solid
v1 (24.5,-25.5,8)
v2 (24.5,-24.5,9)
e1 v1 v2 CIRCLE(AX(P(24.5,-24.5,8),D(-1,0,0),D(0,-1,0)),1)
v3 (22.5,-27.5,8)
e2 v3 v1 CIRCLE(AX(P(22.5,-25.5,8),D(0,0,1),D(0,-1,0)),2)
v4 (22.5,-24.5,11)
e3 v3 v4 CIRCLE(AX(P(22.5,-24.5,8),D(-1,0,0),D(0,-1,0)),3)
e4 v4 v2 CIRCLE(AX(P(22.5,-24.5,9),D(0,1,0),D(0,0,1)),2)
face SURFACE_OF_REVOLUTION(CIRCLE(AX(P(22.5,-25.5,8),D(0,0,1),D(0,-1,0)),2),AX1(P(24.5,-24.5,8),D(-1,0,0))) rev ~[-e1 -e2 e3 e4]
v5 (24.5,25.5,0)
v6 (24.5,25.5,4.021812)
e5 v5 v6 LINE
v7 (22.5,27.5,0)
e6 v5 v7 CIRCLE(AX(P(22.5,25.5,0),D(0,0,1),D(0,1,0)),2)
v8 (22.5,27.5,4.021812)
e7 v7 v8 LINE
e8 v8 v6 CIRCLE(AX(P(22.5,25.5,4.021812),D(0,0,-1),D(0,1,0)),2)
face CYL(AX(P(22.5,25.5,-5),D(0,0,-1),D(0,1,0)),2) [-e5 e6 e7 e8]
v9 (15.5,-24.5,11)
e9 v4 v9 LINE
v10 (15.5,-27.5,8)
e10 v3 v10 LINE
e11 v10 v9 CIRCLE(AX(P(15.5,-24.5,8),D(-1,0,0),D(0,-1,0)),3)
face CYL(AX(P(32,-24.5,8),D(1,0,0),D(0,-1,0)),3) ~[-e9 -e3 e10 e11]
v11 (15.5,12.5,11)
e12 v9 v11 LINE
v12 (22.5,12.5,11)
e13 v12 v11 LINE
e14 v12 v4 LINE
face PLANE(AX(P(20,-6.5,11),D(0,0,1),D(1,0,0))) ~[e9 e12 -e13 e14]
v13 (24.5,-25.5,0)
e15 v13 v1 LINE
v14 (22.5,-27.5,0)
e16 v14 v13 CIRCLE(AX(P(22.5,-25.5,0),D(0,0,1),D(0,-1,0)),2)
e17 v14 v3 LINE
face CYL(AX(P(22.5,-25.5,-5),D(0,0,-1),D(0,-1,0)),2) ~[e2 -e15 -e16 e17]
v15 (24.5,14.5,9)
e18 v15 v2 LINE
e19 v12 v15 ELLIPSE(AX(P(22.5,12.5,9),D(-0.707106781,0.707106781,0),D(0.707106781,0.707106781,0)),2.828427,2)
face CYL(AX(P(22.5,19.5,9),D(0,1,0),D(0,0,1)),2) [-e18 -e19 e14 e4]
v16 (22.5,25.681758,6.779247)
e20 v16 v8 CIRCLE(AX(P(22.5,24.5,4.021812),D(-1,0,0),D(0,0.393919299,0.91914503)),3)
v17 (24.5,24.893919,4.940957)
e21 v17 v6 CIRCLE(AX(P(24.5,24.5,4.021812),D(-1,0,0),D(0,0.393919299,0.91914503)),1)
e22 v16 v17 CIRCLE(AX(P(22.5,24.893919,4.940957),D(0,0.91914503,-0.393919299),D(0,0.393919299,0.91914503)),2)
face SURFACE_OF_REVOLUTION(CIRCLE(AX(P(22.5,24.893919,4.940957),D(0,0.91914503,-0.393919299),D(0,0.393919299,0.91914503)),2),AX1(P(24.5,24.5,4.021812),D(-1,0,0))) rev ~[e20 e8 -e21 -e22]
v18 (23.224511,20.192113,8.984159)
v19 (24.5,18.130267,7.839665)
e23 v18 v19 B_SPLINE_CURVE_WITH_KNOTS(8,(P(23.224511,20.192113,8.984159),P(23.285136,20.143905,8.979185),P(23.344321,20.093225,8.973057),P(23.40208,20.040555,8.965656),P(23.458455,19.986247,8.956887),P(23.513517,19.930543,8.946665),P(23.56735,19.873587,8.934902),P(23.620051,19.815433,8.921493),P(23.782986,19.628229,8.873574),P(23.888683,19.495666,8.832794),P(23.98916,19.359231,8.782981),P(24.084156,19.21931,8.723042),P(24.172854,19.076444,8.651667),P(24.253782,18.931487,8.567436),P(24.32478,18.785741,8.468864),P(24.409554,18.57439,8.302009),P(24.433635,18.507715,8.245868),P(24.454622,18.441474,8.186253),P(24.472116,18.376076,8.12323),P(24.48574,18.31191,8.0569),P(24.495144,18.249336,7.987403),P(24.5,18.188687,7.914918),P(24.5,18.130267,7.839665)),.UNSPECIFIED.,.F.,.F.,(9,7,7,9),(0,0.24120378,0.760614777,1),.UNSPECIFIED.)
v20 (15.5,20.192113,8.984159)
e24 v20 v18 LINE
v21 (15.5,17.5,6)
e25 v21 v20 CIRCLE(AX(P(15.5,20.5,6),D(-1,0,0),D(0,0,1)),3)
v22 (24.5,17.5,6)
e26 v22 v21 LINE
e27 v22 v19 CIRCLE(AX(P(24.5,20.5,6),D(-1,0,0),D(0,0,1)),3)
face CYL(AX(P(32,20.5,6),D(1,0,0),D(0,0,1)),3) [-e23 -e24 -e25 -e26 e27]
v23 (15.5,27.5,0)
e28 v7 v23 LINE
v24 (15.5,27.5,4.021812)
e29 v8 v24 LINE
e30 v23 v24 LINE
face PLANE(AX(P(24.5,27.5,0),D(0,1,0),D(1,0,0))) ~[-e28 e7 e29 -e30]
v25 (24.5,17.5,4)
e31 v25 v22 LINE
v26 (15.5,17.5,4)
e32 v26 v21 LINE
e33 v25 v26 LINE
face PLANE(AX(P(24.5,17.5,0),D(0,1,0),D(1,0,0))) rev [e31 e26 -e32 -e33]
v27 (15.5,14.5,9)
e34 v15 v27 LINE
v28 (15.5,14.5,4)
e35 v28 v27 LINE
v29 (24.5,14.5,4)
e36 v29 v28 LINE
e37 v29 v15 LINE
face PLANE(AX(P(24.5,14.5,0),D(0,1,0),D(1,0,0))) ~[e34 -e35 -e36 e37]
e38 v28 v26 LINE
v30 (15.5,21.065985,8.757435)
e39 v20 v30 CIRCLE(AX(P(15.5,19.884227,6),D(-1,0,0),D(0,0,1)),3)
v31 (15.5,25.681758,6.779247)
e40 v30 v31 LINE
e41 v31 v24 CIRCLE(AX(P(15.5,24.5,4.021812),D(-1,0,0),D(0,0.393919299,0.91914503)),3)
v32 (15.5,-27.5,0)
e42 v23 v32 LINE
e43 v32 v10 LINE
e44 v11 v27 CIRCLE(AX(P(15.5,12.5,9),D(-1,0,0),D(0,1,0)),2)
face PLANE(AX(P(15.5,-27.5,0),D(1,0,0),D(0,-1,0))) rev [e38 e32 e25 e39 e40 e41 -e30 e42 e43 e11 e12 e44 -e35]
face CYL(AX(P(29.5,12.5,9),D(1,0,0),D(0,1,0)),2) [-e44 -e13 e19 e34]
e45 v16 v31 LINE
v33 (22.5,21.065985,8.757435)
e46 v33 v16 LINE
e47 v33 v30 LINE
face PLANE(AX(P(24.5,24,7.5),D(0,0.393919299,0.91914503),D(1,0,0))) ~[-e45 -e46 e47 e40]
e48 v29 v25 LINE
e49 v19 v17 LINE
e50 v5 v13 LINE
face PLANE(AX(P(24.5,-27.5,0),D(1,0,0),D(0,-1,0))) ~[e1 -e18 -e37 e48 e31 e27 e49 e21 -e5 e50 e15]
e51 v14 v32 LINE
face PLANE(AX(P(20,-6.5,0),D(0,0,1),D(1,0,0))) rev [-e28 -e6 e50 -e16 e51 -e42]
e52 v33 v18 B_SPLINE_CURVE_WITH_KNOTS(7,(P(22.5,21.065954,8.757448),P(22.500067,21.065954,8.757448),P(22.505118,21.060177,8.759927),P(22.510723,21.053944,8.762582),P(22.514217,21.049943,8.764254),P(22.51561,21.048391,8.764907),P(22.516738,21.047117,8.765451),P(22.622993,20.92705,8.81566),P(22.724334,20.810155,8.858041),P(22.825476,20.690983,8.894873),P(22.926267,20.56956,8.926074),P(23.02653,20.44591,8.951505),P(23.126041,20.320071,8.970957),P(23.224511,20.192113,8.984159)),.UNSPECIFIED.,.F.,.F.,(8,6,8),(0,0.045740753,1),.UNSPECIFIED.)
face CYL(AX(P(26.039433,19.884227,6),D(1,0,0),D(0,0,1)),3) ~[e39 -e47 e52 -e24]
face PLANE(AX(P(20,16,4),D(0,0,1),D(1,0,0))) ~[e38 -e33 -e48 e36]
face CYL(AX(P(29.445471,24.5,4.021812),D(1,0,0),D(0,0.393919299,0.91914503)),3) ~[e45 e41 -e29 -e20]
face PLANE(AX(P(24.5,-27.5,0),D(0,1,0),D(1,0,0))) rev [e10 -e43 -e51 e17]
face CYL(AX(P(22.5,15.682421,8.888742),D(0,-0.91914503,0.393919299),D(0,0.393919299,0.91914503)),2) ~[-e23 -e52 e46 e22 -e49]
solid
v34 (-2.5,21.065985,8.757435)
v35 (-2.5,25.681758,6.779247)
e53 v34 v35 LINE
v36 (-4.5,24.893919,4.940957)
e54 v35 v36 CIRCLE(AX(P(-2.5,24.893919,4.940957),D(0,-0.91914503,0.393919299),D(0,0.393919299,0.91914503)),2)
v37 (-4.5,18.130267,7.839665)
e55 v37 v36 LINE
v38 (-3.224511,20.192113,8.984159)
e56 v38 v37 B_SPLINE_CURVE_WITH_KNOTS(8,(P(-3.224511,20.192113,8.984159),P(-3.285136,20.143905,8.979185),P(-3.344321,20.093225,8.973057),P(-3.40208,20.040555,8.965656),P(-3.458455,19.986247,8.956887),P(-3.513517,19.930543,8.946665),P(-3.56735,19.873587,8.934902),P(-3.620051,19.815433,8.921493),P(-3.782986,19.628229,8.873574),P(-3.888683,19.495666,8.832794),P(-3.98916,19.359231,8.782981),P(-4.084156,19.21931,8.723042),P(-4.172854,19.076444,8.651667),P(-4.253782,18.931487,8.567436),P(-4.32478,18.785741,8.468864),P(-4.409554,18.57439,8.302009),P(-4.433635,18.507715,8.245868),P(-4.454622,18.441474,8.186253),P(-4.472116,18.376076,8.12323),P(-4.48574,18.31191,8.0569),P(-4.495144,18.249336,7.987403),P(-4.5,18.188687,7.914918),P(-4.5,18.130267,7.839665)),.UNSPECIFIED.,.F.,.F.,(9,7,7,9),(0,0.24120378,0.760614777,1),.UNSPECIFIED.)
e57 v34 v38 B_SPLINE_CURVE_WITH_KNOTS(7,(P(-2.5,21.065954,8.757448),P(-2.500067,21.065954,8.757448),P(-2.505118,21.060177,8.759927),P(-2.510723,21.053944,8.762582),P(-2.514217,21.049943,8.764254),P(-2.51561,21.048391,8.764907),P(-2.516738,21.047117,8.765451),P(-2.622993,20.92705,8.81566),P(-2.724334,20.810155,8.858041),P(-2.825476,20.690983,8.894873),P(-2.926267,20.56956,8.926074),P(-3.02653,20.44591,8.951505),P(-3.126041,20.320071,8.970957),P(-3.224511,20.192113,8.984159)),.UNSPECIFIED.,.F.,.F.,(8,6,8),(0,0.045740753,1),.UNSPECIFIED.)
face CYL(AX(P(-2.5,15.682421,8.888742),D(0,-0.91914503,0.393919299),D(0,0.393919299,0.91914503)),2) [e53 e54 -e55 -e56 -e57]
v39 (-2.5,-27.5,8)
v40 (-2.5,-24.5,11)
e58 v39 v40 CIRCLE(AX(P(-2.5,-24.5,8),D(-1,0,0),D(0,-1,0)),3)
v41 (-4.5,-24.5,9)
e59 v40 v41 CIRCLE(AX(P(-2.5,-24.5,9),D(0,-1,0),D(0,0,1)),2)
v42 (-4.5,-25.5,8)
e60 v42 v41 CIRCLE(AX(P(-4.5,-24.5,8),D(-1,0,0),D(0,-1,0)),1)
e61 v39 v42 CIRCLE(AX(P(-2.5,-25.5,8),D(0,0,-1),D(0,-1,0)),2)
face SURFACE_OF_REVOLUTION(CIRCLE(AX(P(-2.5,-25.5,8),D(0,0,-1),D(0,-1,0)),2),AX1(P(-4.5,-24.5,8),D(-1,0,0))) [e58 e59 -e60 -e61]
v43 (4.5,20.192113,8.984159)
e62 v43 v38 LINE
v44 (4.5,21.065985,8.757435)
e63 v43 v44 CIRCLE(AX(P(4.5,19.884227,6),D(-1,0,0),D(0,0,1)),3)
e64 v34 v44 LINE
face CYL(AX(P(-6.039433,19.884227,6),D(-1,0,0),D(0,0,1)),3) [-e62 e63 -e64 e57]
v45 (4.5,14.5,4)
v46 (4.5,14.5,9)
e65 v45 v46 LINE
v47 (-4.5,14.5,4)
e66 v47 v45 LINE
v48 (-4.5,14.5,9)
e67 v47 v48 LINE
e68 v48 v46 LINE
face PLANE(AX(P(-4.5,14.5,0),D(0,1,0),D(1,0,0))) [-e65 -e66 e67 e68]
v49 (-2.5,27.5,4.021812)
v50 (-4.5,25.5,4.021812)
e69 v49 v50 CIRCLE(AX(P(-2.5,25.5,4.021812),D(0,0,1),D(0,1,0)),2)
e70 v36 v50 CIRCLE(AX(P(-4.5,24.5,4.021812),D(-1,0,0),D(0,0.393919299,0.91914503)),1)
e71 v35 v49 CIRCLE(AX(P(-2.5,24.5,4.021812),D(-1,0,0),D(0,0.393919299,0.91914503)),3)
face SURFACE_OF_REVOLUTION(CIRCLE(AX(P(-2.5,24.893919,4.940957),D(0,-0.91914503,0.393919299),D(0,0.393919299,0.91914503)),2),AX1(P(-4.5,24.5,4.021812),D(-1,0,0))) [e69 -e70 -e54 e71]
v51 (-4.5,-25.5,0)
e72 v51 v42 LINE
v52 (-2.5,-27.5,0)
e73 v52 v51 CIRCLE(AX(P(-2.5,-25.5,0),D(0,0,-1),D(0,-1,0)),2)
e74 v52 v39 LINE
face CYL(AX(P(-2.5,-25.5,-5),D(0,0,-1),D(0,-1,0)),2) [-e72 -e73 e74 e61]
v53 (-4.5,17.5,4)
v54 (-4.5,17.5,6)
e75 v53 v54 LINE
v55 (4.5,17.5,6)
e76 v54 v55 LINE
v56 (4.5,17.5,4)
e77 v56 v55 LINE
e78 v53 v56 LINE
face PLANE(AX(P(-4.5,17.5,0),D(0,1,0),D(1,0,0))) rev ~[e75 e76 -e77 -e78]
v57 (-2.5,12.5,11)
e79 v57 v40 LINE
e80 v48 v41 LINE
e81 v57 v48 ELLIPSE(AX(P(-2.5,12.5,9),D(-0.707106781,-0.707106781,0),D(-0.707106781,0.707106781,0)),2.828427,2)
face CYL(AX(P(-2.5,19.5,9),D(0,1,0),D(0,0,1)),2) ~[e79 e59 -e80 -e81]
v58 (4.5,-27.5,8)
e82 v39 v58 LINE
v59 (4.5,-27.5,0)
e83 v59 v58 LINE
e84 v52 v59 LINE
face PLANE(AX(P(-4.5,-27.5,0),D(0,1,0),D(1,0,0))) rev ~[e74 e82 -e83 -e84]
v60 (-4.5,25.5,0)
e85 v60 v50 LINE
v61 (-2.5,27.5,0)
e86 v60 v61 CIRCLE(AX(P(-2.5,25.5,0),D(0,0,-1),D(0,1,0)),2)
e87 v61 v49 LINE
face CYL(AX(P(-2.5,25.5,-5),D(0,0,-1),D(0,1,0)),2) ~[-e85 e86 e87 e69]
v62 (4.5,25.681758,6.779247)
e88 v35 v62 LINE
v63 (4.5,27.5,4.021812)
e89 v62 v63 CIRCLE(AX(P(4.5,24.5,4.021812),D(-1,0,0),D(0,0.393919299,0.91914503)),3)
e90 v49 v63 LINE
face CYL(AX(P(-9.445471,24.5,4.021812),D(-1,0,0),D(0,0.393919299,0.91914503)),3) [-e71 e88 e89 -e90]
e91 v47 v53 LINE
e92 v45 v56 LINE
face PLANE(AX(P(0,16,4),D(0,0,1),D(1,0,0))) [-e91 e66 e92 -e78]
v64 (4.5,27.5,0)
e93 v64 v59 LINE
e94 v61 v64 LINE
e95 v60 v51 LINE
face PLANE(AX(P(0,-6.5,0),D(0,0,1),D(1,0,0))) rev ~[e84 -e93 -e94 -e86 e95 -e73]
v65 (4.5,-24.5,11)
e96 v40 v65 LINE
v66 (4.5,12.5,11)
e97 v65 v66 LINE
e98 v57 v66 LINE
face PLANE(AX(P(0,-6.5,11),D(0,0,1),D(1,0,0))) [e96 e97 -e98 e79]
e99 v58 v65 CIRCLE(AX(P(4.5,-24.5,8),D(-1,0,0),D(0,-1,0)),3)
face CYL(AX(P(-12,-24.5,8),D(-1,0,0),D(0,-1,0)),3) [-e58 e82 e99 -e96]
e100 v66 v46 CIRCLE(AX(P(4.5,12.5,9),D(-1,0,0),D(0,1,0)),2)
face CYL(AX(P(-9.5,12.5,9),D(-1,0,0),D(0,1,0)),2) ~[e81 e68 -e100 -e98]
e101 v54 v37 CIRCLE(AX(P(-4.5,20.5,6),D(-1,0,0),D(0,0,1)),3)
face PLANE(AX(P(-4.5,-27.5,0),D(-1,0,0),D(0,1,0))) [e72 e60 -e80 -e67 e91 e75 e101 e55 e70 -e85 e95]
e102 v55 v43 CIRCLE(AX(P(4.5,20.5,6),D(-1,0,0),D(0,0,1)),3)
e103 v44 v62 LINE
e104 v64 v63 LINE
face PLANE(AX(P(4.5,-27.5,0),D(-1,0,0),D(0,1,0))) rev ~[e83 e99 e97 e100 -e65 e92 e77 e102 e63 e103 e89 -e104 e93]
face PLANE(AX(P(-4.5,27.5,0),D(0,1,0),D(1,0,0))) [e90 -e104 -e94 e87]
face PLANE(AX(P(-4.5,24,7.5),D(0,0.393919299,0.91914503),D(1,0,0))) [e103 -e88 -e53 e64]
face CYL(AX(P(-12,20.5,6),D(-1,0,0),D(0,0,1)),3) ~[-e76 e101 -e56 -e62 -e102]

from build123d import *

# Parameters (mm, degrees)
F0_W         = 9
F0_H         = 3
F1_DEPTH     = 4
F0_H_2       = 10
F2_DEPTH     = 9
F0_H_3       = 42
F3_DEPTH     = 11
F4_SIZE2     = 3
F4_SIZE      = 7
F5_T1_DEPTH  = 24
F5_T3_DEPTH  = 18.8909423697
F5_T5_DEPTH  = 12.0788655293
F6_T1_DEPTH  = 19
F6_T3_DEPTH  = 44
F6_T5_DEPTH  = 10.021811526
F6_T7_DEPTH  = 13
F6_T9_DEPTH  = 9.0218115261
F6_T12_ANGLE = 90.0000000053
F6_T14_ANGLE = 66.8014094864


# Not quite as in the source:
# - a fillet or chamfer that OpenCascade refuses, or shapes differently, is made with other operations: its cross-section is extruded or revolved along the edge and cut away or added


with BuildPart() as f1:
    # F0 (on Top) → F1 (new body)
    with BuildSketch(Plane.XY):
        with Locations((0, 16)):
            Rectangle(F0_W, F0_H)
    extrude(amount=F1_DEPTH)

    # F0 (on Top) → F2 (join)
    with BuildSketch(Plane.XY):
        with Locations((0, 22.5)):
            Rectangle(F0_W, F0_H_2)
    extrude(amount=F2_DEPTH)

    # F0 (on Top) → F3 (join)
    with BuildSketch(Plane.XY):
        with Locations((0, -6.5)):
            Rectangle(F0_W, F0_H_3)
    extrude(amount=F3_DEPTH)

    # F4
    f4_edges = [f1.edges().sort_by_distance(p)[0] for p in [
        (0, 27.5, 9),
    ]]
    f4_side = f1.faces().sort_by_distance((0, 22.5, 9))[0]
    chamfer(f4_edges, length=F4_SIZE, length2=F4_SIZE2, reference=f4_side)

    # F5: fillet of radius 3 on 4 edges, made by hand

    # F5_s2 → F5_t1 (cut)
    with BuildSketch(Plane.YZ.offset(-12)):
        with BuildLine():
            ThreePointArc((20.5, 9), (18.3786796564, 8.1213203436), (17.5, 6))
            Line((17.5, 6), (17.5, 9))
            Line((17.5, 9), (20.5, 9))
        make_face()
        with BuildLine():
            ThreePointArc((-27.5, 8), (-26.6213203436, 10.1213203436), (-24.5, 11))
            Line((-24.5, 11), (-27.5, 11))
            Line((-27.5, 11), (-27.5, 8))
        make_face()
    extrude(amount=F5_T1_DEPTH, mode=Mode.SUBTRACT)

    # F5_s4 → F5_t3 (cut)
    with BuildSketch(Plane.YZ.offset(-9.4454711849)):
        with BuildLine():
            ThreePointArc((25.6817578957, 6.7792466161), (27.0045232767, 5.6732845523), (27.5, 4.0218115261))
            Line((27.5, 4.0218115261), (27.5, 6))
            Line((27.5, 6), (25.6817578957, 6.7792466161))
        make_face()
    extrude(amount=F5_T3_DEPTH, mode=Mode.SUBTRACT)

    # F5_s6 → F5_t5 (cut)
    with BuildSketch(Plane.YZ.offset(-6.0394327647)):
        with BuildLine():
            ThreePointArc((19.8842268941, 9), (20.4874245109, 8.9387331684), (21.0659847899, 8.7574350901))
            Line((21.0659847899, 8.7574350901), (20.5, 9))
            Line((20.5, 9), (19.8842268941, 9))
        make_face()
    extrude(amount=F5_T5_DEPTH, mode=Mode.SUBTRACT)

    # F6: fillet of radius 2 on 7 edges, made by hand

    # F6_s2 → F6_t1 (cut)
    with BuildSketch(Plane.YZ.offset(-9.5)):
        with BuildLine():
            ThreePointArc((14.5, 9), (13.9142135624, 10.4142135624), (12.5, 11))
            Line((12.5, 11), (14.5, 11))
            Line((14.5, 11), (14.5, 9))
        make_face()
    extrude(amount=F6_T1_DEPTH, mode=Mode.SUBTRACT)

    # F6_s4 → F6_t3 (cut)
    with BuildSketch(Plane.XZ.offset(-19.5)):
        with BuildLine():
            ThreePointArc((-2.5, 11), (-3.9142135624, 10.4142135624), (-4.5, 9))
            Line((-4.5, 9), (-4.5, 11))
            Line((-4.5, 11), (-2.5, 11))
        make_face()
    extrude(amount=F6_T3_DEPTH, mode=Mode.SUBTRACT)

    # F6_s6 → F6_t5 (cut)
    with BuildSketch(Plane(origin=(0, 10.0306044674, -4.298830486), x_dir=(1, 0, 0), z_dir=(0, 0.91914503, -0.3939192986))):
        with BuildLine():
            ThreePointArc((-2.5, -16.347650891), (-3.9142135624, -15.7618644534), (-4.5, -14.347650891))
            Line((-4.5, -14.347650891), (-4.5, -16.347650891))
            Line((-4.5, -16.347650891), (-2.5, -16.347650891))
        make_face()
    extrude(amount=F6_T5_DEPTH, mode=Mode.SUBTRACT)

    # F6_s8 → F6_t7 (cut)
    with BuildSketch(Plane.XY.offset(-5)):
        with BuildLine():
            ThreePointArc((-2.5, -27.5), (-3.9142135624, -26.9142135624), (-4.5, -25.5))
            Line((-4.5, -25.5), (-4.5, -27.5))
            Line((-4.5, -27.5), (-2.5, -27.5))
        make_face()
    extrude(amount=F6_T7_DEPTH, mode=Mode.SUBTRACT)

    # F6_s10 → F6_t9 (cut)
    with BuildSketch(Plane.XY.offset(-5)):
        with BuildLine():
            ThreePointArc((-2.5, 27.5), (-3.9142135624, 26.9142135624), (-4.5, 25.5))
            Line((-4.5, 25.5), (-4.5, 27.5))
            Line((-4.5, 27.5), (-2.5, 27.5))
        make_face()
    extrude(amount=F6_T9_DEPTH, mode=Mode.SUBTRACT)

    # F6_s11 → F6_t12 (revolve, cut)
    with BuildSketch(Plane.XY.offset(8.0000000001)):
        with BuildLine():
            ThreePointArc((-2.5, -27.5), (-3.9142135624, -26.9142135624), (-4.5, -25.5))
            Line((-4.5, -25.5), (-4.5, -27.5))
            Line((-4.5, -27.5), (-2.5, -27.5))
        make_face()
    revolve(axis=Axis((-4.5, -24.5000000001, 8.0000000001), (-1, 0, 0)), revolution_arc=F6_T12_ANGLE, mode=Mode.SUBTRACT)

    # F6_s13 → F6_t14 (revolve, cut)
    with BuildSketch(Plane(origin=(0, 19.2421027237, -8.2466154526), x_dir=(1, 0, 0), z_dir=(0, -0.91914503, 0.3939192986))):
        with BuildLine():
            ThreePointArc((-2.5, 16.3476508906), (-3.9142135624, 15.761864453), (-4.5, 14.3476508906))
            Line((-4.5, 14.3476508906), (-4.5, 16.3476508906))
            Line((-4.5, 16.3476508906), (-2.5, 16.3476508906))
        make_face()
    revolve(axis=Axis((-4.5, 24.5, 4.021811526), (-1, 0, 0)), revolution_arc=F6_T14_ANGLE, mode=Mode.SUBTRACT)


with BuildPart() as f8_1:
    # F8: instance of F1
    add(f1.part.mirror(Plane.YZ.offset(10)))


solid = Compound([f1.part, f8_1.part])
